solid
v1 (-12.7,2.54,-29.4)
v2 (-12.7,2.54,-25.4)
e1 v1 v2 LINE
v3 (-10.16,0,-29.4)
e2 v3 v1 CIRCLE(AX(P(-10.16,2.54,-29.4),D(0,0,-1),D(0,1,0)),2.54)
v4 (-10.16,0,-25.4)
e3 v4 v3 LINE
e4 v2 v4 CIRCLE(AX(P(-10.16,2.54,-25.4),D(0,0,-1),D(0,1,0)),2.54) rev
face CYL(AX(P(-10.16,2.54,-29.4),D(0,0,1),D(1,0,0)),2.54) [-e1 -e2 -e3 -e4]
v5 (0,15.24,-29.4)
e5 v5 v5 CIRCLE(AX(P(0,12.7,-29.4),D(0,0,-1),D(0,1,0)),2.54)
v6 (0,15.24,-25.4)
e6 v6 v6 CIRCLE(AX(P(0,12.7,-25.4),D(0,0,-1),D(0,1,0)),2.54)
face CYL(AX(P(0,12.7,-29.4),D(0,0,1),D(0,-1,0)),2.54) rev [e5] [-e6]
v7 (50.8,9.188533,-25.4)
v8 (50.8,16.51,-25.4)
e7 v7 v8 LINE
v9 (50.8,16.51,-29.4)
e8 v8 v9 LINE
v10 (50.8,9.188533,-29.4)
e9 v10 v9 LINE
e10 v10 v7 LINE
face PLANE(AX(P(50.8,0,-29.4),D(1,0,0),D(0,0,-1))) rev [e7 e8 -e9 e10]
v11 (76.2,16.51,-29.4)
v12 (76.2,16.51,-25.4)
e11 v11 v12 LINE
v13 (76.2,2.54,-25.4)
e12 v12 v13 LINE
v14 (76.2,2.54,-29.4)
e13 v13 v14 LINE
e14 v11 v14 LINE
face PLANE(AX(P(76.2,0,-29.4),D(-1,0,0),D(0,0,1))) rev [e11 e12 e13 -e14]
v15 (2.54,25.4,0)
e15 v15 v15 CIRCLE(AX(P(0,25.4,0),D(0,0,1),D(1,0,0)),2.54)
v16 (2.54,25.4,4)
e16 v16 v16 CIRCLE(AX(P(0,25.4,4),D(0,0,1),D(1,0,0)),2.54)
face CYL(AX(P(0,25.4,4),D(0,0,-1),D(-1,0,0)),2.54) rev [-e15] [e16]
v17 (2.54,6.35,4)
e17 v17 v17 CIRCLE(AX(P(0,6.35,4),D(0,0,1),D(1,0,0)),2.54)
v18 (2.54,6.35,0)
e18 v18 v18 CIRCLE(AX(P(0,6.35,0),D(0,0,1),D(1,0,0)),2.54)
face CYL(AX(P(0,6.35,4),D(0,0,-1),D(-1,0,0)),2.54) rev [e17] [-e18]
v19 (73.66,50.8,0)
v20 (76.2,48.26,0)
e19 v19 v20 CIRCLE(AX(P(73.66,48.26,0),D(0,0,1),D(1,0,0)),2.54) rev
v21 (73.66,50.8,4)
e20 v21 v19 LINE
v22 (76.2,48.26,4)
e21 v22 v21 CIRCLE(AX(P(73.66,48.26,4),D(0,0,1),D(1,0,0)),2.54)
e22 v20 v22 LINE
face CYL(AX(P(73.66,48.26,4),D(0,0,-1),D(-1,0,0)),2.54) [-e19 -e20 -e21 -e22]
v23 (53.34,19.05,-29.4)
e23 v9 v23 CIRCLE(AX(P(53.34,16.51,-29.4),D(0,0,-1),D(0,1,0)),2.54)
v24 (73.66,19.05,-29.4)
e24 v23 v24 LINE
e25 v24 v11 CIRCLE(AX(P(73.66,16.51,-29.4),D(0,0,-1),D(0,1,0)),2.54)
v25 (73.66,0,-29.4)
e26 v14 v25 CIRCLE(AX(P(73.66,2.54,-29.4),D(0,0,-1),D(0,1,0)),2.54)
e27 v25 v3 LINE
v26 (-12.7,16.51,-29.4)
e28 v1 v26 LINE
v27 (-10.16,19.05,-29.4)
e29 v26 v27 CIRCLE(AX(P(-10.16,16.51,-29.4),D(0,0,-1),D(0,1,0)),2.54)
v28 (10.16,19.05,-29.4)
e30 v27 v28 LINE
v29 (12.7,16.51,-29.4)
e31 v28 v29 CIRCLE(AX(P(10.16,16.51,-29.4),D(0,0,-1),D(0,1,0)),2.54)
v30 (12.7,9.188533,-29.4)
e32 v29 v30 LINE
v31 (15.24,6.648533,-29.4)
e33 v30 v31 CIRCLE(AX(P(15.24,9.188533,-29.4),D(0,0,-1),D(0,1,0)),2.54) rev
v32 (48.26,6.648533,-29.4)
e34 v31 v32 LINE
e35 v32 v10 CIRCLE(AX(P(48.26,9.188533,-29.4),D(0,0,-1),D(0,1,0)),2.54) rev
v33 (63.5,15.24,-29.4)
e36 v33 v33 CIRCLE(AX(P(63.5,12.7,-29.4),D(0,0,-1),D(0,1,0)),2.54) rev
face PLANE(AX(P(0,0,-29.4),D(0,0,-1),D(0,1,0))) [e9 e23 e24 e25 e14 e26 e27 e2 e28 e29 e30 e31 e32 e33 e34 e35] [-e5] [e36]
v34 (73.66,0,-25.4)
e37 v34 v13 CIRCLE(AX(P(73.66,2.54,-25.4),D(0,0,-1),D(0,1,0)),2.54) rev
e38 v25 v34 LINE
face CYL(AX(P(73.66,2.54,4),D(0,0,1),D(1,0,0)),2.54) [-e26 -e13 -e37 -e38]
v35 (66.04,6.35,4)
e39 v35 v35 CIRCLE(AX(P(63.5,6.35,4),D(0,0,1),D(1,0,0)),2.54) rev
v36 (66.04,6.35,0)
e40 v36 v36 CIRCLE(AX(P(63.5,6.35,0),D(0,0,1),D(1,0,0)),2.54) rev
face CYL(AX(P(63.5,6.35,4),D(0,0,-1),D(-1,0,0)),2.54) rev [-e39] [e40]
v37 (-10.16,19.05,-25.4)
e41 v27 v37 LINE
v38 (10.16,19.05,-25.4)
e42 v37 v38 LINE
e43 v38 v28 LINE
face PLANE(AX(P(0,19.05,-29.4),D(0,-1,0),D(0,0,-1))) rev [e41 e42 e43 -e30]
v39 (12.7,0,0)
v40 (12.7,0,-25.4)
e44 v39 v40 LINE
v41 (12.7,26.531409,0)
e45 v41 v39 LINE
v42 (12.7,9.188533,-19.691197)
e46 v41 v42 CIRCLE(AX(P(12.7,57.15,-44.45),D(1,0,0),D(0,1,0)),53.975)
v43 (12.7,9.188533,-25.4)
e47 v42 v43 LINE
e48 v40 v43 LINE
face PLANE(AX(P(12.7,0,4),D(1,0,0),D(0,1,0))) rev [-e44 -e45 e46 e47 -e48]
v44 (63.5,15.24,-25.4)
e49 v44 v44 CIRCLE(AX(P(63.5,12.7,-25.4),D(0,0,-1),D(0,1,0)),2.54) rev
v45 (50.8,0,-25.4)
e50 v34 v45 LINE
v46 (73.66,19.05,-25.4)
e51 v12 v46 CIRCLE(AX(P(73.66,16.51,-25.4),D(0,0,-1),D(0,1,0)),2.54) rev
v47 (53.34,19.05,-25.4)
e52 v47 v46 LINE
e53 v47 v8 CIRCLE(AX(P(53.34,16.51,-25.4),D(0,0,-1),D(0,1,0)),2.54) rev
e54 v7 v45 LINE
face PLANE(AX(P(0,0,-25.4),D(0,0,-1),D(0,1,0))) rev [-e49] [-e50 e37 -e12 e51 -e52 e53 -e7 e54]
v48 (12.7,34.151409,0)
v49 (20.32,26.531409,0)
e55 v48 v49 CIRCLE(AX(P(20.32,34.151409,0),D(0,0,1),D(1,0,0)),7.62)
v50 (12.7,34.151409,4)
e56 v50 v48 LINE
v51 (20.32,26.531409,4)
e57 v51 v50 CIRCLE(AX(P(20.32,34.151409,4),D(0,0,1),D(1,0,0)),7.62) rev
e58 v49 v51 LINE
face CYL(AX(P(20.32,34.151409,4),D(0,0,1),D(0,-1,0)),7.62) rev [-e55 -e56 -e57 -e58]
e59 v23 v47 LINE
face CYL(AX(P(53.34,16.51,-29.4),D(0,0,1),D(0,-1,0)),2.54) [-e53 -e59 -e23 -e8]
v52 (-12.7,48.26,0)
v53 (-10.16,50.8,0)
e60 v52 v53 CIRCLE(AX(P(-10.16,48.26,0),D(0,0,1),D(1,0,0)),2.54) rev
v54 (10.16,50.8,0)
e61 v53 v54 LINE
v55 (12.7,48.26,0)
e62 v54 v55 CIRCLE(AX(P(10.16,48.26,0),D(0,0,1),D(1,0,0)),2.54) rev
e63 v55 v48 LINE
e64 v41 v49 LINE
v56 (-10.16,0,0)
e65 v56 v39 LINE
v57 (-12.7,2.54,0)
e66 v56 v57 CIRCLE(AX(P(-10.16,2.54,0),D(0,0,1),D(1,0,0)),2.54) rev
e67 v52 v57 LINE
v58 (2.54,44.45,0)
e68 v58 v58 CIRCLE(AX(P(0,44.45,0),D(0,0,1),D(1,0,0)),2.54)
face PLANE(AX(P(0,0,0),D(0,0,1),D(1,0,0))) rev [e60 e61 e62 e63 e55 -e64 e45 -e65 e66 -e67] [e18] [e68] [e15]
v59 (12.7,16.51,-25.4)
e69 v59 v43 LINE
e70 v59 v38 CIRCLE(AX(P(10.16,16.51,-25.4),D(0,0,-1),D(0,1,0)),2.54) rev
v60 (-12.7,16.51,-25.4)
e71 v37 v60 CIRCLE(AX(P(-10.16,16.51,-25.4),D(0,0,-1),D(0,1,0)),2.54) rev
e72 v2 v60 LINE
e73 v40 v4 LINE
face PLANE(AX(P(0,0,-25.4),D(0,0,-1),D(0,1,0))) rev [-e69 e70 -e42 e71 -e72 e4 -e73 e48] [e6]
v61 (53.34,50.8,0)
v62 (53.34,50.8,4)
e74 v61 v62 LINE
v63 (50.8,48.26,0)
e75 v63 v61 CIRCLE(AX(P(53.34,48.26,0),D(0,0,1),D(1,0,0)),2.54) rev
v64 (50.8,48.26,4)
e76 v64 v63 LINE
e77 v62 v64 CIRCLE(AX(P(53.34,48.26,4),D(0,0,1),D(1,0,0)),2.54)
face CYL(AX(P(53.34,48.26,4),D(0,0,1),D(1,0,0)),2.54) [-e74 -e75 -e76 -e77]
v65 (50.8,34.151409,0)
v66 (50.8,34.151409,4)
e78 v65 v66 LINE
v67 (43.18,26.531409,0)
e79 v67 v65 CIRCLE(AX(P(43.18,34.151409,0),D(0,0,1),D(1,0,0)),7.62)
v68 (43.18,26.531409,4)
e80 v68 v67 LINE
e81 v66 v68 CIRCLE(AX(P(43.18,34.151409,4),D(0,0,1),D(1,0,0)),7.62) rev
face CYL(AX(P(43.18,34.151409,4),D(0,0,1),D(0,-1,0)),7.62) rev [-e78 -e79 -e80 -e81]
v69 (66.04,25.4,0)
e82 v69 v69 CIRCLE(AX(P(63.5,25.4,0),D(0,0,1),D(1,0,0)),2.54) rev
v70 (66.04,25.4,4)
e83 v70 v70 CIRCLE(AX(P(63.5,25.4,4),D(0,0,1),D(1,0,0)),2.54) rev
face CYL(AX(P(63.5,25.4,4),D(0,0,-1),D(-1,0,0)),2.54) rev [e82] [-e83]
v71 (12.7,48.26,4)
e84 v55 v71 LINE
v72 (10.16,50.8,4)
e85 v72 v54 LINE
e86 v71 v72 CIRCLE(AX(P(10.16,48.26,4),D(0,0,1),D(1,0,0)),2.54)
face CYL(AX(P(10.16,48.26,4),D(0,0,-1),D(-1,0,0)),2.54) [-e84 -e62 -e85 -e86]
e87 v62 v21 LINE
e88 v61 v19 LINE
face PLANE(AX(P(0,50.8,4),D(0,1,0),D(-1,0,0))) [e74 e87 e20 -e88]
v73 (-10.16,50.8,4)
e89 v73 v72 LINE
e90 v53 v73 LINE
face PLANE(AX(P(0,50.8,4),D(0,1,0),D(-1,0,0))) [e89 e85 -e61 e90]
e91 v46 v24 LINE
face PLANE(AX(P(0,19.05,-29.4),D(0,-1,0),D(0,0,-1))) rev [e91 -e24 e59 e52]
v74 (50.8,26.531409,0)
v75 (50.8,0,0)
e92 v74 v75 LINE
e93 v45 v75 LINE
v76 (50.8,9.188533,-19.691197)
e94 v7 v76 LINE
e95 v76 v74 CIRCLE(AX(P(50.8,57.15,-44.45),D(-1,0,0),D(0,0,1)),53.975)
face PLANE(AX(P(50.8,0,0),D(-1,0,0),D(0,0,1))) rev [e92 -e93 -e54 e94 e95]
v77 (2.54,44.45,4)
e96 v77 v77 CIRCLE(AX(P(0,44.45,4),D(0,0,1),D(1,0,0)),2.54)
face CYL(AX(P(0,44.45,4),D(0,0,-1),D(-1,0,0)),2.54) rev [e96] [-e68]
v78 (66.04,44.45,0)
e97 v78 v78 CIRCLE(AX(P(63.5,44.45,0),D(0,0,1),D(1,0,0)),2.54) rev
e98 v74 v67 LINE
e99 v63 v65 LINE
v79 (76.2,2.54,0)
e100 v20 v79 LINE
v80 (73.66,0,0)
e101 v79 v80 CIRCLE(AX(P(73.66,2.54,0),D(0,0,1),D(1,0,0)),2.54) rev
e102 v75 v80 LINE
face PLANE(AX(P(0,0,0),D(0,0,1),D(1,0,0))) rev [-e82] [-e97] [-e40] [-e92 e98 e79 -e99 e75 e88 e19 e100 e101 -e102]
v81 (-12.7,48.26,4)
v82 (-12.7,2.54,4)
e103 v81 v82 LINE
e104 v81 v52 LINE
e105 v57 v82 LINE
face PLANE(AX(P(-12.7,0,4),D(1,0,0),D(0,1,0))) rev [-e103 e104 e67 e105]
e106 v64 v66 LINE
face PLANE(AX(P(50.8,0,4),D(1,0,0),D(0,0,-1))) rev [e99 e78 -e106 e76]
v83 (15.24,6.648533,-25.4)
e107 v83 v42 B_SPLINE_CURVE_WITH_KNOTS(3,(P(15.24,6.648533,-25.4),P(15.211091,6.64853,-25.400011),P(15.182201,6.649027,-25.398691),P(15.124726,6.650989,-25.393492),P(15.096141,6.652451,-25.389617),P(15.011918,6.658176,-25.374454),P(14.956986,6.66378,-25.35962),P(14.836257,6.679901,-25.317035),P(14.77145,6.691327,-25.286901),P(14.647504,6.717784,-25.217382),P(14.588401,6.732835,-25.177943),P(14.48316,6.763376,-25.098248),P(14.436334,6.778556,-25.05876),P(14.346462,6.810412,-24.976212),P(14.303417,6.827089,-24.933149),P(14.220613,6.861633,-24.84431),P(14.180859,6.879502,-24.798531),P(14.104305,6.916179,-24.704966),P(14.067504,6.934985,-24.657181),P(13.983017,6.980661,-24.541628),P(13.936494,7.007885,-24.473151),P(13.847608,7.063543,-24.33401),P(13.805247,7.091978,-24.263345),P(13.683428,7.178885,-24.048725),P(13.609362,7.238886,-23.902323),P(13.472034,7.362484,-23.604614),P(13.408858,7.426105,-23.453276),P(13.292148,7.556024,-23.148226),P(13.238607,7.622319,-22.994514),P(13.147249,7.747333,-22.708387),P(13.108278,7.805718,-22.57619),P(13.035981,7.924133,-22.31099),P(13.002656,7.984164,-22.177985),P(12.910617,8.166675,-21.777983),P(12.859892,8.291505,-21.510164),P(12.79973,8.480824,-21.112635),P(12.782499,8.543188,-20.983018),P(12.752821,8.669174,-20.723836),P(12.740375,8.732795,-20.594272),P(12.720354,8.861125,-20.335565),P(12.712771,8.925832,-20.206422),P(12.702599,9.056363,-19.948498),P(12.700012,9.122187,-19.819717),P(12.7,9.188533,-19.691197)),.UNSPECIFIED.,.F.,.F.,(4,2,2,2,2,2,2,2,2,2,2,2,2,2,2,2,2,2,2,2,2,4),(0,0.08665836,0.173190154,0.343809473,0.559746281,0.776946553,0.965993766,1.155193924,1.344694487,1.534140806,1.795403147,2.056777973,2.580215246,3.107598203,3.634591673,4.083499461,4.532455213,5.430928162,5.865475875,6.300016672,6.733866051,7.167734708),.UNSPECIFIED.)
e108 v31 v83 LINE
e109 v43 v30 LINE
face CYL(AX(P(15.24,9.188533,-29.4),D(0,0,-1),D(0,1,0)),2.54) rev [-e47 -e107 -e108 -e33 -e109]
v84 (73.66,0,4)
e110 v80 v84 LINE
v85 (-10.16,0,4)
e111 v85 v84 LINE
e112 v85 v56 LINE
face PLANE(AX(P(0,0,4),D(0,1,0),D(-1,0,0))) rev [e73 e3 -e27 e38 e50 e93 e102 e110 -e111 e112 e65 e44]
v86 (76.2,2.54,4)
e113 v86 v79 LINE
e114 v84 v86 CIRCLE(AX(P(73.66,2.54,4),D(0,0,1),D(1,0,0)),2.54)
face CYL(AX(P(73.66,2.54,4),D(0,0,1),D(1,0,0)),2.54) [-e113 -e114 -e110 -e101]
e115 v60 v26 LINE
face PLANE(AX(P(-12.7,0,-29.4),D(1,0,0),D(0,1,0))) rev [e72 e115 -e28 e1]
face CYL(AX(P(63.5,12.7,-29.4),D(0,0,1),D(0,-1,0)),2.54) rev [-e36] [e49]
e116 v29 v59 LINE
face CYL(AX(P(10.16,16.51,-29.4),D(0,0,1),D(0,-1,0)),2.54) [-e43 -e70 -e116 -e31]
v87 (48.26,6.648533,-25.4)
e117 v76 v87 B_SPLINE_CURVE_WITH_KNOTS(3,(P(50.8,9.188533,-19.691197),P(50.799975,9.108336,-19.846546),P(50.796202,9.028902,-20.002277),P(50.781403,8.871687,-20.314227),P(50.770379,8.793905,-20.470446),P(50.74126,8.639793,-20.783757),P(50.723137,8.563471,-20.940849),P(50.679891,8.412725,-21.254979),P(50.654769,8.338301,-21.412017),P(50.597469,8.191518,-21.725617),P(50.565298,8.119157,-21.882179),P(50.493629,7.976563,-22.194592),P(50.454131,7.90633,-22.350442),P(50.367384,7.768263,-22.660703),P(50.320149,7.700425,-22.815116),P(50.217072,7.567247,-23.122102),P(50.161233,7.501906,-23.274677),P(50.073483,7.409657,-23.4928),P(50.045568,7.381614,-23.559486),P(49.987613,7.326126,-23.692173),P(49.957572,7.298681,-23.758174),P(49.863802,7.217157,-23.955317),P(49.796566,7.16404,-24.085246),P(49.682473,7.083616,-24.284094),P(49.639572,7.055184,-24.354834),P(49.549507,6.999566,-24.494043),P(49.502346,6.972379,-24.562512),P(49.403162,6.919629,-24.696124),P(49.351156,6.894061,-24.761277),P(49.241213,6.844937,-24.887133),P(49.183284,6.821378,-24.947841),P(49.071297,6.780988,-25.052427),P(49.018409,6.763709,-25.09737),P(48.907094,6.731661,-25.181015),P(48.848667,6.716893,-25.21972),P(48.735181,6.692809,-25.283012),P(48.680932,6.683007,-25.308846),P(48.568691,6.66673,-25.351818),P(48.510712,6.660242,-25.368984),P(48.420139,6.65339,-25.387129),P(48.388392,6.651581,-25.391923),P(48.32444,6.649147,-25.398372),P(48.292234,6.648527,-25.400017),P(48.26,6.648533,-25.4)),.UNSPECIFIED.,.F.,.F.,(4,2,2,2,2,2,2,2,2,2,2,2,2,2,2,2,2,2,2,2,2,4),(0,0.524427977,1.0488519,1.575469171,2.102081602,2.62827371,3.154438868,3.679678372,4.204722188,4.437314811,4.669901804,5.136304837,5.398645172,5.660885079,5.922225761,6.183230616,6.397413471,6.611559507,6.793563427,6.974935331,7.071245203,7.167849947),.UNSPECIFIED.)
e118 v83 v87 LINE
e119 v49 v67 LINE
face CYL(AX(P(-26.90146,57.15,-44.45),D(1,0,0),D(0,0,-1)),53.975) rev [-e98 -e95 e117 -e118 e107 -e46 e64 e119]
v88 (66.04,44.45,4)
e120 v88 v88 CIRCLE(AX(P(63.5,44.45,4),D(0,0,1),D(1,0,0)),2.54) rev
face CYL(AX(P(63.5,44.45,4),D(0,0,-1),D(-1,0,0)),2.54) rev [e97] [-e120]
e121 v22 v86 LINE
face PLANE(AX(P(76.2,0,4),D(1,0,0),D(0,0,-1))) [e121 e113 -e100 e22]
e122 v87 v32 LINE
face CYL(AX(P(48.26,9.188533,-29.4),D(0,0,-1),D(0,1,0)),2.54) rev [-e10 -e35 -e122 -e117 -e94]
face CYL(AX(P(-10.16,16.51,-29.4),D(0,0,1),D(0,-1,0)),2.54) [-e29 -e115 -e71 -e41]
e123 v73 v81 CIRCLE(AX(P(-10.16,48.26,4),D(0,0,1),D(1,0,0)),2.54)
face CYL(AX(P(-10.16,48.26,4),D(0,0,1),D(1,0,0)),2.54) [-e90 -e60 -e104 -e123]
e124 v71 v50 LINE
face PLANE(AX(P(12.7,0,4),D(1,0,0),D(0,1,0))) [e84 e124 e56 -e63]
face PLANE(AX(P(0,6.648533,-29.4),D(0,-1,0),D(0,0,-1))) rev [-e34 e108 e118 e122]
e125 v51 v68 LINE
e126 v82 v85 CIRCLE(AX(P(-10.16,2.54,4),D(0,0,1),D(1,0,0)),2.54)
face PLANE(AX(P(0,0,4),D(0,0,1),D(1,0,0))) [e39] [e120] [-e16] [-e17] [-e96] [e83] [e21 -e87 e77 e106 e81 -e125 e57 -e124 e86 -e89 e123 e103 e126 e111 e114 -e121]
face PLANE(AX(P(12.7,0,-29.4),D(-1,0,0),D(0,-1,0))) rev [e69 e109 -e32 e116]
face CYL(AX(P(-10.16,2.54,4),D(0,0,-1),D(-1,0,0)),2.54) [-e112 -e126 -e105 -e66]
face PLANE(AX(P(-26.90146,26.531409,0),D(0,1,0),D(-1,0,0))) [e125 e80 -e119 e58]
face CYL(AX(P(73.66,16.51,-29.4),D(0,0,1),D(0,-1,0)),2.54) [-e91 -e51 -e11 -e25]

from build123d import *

# Parameters (mm, degrees)
SKETCH1_W             = 25.4
SKETCH1_H             = 50.8
SKETCH1_R             = 2.54
BOSS_EXTRUDE1_DEPTH   = 4
BOSS_EXTRUDE1_2_DEPTH = 4
SKETCH2_W             = 4
SKETCH2_H             = 26.531408834
BOSS_EXTRUDE2_DEPTH   = 38.1
SKETCH3_R             = 2.54
SKETCH3_W             = 19.05
SKETCH3_H             = 6.648533437
BOSS_EXTRUDE3_DEPTH   = 4
FILLET1_R             = 7.62
FILLET2_R             = 2.54


with BuildPart() as part:
    # Sketch1 → Boss-Extrude1 (new body)
    with BuildSketch(Plane.XY):
        with Locations((0, 25.4)):
            Rectangle(SKETCH1_W, SKETCH1_H)
        with Locations((0, 44.45)):
            Circle(SKETCH1_R, mode=Mode.SUBTRACT)
        with Locations((0, 25.4)):
            Circle(SKETCH1_R, mode=Mode.SUBTRACT)
        with Locations((0, 6.35)):
            Circle(SKETCH1_R, mode=Mode.SUBTRACT)
    extrude(amount=BOSS_EXTRUDE1_DEPTH)



with BuildPart() as body_2:
    # Sketch1 → Boss-Extrude1 2 (new body)
    with BuildSketch(Plane.XY):
        with Locations((63.5, 25.4)):
            Rectangle(SKETCH1_W, SKETCH1_H)
        with Locations((63.5, 25.4)):
            Circle(SKETCH1_R, mode=Mode.SUBTRACT)
        with Locations((63.5, 44.45)):
            Circle(SKETCH1_R, mode=Mode.SUBTRACT)
        with Locations((63.5, 6.35)):
            Circle(SKETCH1_R, mode=Mode.SUBTRACT)
    extrude(amount=BOSS_EXTRUDE1_2_DEPTH)


with BuildPart() as part_1:
    add(part.part)

    add(body_2.part)  # Boss-Extrude2 merges body 2
    # Sketch2 → Boss-Extrude2 (add)
    with BuildSketch(Plane.ZY.offset(-50.8)):
        with BuildLine():
            Line((0, 0), (0, 26.531408834))
            ThreePointArc((0, 26.531408834), (-11.179973196, 14.648165434), (-25.4, 6.648533437))
            Line((-25.4, 6.648533437), (-25.4, 0))
            Line((-25.4, 0), (0, 0))
        make_face()
        with Locations((2, 13.265704417)):
            Rectangle(SKETCH2_W, SKETCH2_H)
    extrude(amount=BOSS_EXTRUDE2_DEPTH)

    # Sketch3 → Boss-Extrude3 (add)
    # profile 1 of 3: a face of its own
    with BuildSketch(Plane(origin=(0, 0, -25.4), x_dir=(-1, 0, 0), z_dir=(0, 0, -1))):
        Polygon((-12.7, 6.648533437), (-12.7, 0), (12.7, 0), (12.7, 19.05), (-12.7, 19.05), align=None)
        with Locations(Location((0, 12.7, 0), (0, 0, 90))):
            Circle(SKETCH3_R, mode=Mode.SUBTRACT)
    # profile 2 of 3: a face of its own
    with BuildSketch(Plane(origin=(0, 0, -25.4), x_dir=(-1, 0, 0), z_dir=(0, 0, -1))):
        with Locations((-22.225, 3.324266719)):
            Rectangle(SKETCH3_W, SKETCH3_H)
    # profile 3 of 3: a face of its own
    with BuildSketch(Plane(origin=(0, 0, -25.4), x_dir=(-1, 0, 0), z_dir=(0, 0, -1))):
        Polygon((-76.2, 0), (-31.75, 0), (-31.75, 6.648533437), (-50.8, 6.648533437), (-50.8, 19.05), (-76.2, 19.05), align=None)
        with Locations(Location((-63.5, 12.7, 0), (0, 0, 90))):
            Circle(SKETCH3_R, mode=Mode.SUBTRACT)
    extrude(amount=BOSS_EXTRUDE3_DEPTH)

    # Fillet1
    # the kernel refuses this fillet: 7.62 mm, written as the material it adds along each edge
    with BuildSketch(Plane(origin=(12.7, 26.531408834, 4), x_dir=(0, 1, 0), z_dir=(0, 0, -1)), Plane(origin=(50.8, 26.531408834, 4), x_dir=(-1, 0, 0), z_dir=(0, 0, -1))) as fillet1_piece_1:
        with BuildLine():
            CenterArc((FILLET1_R, FILLET1_R), FILLET1_R, 180, 90)
            Line((0, FILLET1_R), (0, 0))
            Line((0, 0), (FILLET1_R, 0))
        make_face()
    extrude(amount=4)

    # Fillet2
    # the kernel refuses this fillet: 2.54 mm, written as the material it adds along each edge
    with BuildSketch(Plane(origin=(12.7, 6.648533437, -19.05), x_dir=(1, 0, 0), z_dir=(0, 0, -1))) as fillet2_piece_1:
        with BuildLine():
            CenterArc((FILLET2_R, -FILLET2_R), FILLET2_R, 90, 90)
            Line((0, -FILLET2_R), (0, 0))
            Line((0, 0), (FILLET2_R, 0))
        make_face()
    extrude(amount=10.35)
    with BuildSketch(Plane(origin=(50.8, 6.648533437, -19.05), x_dir=(-1, 0, 0), z_dir=(0, 0, -1))) as fillet2_piece_2:
        with BuildLine():
            CenterArc((FILLET2_R, FILLET2_R), FILLET2_R, 180, 90)
            Line((0, FILLET2_R), (0, 0))
            Line((0, 0), (FILLET2_R, 0))
        make_face()
    extrude(amount=10.35)
    # the kernel refuses this fillet: 2.54 mm, written as the material it takes off along each edge
    with BuildSketch(Plane(origin=(12.7, 50.8, -6.35), x_dir=(-1, 0, 0), z_dir=(0, 0, 1)), Plane(origin=(-12.7, 0, -6.35), x_dir=(1, 0, 0), z_dir=(0, 0, 1)), Plane(origin=(76.2, 0, -6.35), x_dir=(0, 1, 0), z_dir=(0, 0, 1)), Plane(origin=(76.2, 50.8, -6.35), x_dir=(-1, 0, 0), z_dir=(0, 0, 1)), Plane(origin=(-12.7, 19.05, -19.05), x_dir=(1, 0, 0), z_dir=(0, 0, -1)), Plane(origin=(12.7, 19.05, -19.05), x_dir=(0, -1, 0), z_dir=(0, 0, -1)), Plane(origin=(50.8, 19.05, -19.05), x_dir=(1, 0, 0), z_dir=(0, 0, -1)), Plane(origin=(76.2, 0, -19.05), x_dir=(-1, 0, 0), z_dir=(0, 0, -1))) as fillet2_2_piece_1:
        with BuildLine():
            CenterArc((FILLET2_R, FILLET2_R), FILLET2_R, 180, 90)
            Line((0, FILLET2_R), (0, 0))
            Line((0, 0), (FILLET2_R, 0))
        make_face()
    extrude(amount=16.7, mode=Mode.SUBTRACT)
    with BuildSketch(Plane(origin=(-12.7, 50.8, -6.35), x_dir=(1, 0, 0), z_dir=(0, 0, 1)), Plane(origin=(50.8, 50.8, -6.35), x_dir=(1, 0, 0), z_dir=(0, 0, 1)), Plane(origin=(-12.7, 0, -19.05), x_dir=(1, 0, 0), z_dir=(0, 0, -1)), Plane(origin=(76.2, 19.05, -19.05), x_dir=(-1, 0, 0), z_dir=(0, 0, -1))) as fillet2_2_piece_2:
        with BuildLine():
            CenterArc((FILLET2_R, -FILLET2_R), FILLET2_R, 90, 90)
            Line((0, -FILLET2_R), (0, 0))
            Line((0, 0), (FILLET2_R, 0))
        make_face()
    extrude(amount=16.7, mode=Mode.SUBTRACT)


solid = part_1.part
